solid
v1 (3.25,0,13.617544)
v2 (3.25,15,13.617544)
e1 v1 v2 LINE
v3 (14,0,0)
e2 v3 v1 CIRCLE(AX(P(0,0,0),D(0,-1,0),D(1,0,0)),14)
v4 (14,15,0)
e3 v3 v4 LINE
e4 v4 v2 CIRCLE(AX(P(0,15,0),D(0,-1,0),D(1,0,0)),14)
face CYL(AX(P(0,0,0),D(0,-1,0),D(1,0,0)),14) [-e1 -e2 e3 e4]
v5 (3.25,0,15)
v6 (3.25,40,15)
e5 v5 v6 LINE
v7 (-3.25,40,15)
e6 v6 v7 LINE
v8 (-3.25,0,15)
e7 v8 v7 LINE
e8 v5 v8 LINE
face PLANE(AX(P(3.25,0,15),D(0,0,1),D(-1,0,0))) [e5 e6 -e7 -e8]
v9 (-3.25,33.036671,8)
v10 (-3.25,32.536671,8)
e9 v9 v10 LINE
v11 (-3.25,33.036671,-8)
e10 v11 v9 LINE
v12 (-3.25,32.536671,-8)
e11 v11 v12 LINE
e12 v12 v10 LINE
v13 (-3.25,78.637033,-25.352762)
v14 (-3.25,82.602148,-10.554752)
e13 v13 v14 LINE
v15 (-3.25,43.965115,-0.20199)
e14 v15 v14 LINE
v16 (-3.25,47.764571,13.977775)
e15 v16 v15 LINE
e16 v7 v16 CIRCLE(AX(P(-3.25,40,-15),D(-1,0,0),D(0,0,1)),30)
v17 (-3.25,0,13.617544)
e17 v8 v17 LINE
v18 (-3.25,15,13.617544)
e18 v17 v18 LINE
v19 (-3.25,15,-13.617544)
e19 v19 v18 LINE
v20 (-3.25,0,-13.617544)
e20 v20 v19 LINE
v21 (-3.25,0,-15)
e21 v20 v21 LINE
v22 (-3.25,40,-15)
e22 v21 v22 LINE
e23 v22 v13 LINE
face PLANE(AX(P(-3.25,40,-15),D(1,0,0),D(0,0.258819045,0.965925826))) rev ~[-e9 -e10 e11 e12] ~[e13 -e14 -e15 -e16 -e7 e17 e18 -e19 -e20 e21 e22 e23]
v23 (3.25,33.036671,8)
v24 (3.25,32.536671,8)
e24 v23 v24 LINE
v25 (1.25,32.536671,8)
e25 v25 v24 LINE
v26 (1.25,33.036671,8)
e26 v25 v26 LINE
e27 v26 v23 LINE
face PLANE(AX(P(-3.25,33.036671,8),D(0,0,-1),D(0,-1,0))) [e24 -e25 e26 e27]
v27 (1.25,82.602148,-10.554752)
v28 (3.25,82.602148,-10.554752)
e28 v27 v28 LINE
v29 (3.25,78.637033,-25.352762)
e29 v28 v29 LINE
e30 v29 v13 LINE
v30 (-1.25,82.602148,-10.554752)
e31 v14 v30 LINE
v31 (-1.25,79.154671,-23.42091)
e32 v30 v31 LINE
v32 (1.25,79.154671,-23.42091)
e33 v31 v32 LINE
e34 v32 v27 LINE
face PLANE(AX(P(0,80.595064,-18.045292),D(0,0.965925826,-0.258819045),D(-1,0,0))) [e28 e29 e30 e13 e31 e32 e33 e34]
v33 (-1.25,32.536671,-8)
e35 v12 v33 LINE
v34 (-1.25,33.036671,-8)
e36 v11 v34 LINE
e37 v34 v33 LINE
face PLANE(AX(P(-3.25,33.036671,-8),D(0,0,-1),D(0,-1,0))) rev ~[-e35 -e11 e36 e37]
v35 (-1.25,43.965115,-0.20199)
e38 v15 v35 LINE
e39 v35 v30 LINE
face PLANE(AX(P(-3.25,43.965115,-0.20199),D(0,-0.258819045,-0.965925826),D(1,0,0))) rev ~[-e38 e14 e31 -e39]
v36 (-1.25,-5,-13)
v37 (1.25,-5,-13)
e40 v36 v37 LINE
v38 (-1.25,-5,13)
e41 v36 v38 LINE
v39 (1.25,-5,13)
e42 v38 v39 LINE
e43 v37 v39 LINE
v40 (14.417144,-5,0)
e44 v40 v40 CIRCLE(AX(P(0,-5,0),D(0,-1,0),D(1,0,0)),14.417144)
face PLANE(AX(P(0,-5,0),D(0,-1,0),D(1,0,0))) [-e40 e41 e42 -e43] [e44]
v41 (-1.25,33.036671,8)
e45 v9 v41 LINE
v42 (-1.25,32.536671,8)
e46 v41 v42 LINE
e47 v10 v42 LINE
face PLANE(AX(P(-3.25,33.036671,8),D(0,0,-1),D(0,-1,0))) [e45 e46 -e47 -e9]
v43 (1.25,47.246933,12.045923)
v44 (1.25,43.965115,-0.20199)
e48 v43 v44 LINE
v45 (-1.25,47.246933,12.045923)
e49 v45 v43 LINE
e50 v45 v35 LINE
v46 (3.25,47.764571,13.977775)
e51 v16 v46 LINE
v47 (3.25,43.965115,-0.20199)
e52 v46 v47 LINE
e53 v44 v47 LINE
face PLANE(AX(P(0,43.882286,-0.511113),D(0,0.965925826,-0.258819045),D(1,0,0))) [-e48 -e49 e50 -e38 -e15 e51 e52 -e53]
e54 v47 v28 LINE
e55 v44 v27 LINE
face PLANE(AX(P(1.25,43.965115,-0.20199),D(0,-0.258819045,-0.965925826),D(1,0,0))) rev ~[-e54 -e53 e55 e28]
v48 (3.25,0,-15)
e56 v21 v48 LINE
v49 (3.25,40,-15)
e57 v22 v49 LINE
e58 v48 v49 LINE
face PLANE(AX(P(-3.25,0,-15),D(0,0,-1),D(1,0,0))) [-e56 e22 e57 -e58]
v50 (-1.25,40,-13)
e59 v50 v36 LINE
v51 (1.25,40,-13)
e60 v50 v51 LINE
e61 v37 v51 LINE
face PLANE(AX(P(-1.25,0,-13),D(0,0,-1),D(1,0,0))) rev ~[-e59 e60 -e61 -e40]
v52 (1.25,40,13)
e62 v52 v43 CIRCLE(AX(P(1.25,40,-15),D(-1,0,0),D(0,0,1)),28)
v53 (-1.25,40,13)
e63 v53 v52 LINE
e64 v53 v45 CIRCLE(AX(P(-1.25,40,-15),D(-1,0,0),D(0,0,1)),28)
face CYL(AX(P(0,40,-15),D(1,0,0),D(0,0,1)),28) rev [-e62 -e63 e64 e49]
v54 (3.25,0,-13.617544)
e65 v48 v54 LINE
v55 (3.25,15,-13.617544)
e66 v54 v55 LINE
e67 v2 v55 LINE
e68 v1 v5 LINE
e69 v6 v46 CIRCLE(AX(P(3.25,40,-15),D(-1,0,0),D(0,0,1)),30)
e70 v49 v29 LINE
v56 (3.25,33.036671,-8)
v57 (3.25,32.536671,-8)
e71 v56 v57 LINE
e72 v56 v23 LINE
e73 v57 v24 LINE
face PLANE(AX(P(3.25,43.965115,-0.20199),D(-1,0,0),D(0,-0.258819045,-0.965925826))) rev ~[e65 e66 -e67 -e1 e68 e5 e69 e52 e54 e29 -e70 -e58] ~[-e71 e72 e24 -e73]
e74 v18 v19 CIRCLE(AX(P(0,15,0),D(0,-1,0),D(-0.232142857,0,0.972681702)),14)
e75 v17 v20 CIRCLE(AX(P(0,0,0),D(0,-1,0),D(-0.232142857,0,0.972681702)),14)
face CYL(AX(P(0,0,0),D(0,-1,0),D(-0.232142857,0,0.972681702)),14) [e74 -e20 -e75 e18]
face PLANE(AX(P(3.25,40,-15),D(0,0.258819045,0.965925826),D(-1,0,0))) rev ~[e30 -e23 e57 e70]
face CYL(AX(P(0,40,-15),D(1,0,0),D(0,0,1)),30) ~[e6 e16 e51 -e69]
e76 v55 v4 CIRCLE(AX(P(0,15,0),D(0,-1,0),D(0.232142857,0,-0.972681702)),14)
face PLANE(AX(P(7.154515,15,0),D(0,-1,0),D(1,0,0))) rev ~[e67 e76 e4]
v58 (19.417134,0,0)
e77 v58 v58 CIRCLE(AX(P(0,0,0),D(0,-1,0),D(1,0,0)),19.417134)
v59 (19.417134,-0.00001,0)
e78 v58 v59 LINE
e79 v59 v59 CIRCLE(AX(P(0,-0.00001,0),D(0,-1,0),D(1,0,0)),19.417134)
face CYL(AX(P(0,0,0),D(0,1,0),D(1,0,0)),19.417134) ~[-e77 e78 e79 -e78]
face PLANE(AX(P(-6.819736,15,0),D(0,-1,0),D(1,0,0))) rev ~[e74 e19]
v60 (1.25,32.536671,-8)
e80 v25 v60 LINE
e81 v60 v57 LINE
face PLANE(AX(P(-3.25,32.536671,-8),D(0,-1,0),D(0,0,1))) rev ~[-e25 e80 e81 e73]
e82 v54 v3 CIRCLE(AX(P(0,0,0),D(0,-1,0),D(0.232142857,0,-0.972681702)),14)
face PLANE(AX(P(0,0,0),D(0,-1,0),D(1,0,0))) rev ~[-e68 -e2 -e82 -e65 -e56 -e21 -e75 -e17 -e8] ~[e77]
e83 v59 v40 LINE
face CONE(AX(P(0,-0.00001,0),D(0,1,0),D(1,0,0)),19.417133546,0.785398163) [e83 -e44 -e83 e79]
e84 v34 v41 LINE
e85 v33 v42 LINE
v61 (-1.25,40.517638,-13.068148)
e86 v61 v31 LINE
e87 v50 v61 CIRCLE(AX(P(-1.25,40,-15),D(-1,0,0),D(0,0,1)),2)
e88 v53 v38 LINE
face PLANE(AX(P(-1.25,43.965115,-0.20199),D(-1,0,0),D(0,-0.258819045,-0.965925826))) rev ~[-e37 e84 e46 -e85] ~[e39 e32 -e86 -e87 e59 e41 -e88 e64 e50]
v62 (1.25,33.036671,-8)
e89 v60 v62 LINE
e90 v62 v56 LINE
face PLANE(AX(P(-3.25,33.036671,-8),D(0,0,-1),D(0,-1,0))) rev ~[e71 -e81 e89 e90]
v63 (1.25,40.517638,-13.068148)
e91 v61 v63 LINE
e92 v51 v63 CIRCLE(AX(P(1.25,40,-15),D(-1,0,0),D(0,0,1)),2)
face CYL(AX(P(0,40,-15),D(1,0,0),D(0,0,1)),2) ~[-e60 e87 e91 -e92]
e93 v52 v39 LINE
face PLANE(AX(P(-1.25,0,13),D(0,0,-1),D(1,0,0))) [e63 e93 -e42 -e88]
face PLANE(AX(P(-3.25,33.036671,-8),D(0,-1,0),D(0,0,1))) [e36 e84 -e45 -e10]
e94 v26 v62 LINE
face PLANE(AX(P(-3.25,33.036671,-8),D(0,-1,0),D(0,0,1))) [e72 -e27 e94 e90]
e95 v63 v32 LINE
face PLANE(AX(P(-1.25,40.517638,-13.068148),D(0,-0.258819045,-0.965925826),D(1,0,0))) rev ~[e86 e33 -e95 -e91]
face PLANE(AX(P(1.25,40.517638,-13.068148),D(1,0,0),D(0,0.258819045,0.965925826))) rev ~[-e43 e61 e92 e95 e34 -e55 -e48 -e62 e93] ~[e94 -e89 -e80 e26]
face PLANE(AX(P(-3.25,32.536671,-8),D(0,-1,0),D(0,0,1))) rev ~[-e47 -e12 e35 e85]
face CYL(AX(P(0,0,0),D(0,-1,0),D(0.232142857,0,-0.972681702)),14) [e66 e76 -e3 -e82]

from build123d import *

# Parameters (mm, degrees)
F0_R        = 19.417133546
F0_W        = 2.5
F0_H        = 26
F1_DEPTH    = 5
F2_SIZE     = 4.99999
F3_DEPTH    = 40
F3_FACE_W   = 6.5
F3_FACE_H   = 30
F3_FACE_W_2 = 2.5
F3_FACE_H_2 = 26
F4_ANGLE    = 15
F6_DEPTH    = 40
F7_W        = 0.5
F7_H        = 16
F8_DEPTH    = 25
F9_DEPTH    = 15


# Not quite as in the source:
# - a fillet or chamfer is up to 0.001 mm smaller than in the source, because OpenCascade refuses the exact size


with BuildPart() as f1:
    # F0 (on Front) → F1 (new body)
    with BuildSketch(Plane.XZ):
        Circle(F0_R)
        with BuildLine():
            ThreePointArc((3.25, 13.6175438314), (10.9886304879, 8.6746757864), (14, 0))
            ThreePointArc((14, 0), (10.9886304879, -8.6746757864), (3.25, -13.6175438314))
            Line((3.25, -13.6175438314), (3.25, -15))
            Line((3.25, -15), (-3.25, -15))
            Line((-3.25, -15), (-3.25, -13.6175438314))
            ThreePointArc((-3.25, -13.6175438314), (-14, 0), (-3.25, 13.6175438314))
            Line((-3.25, 13.6175438314), (-3.25, 15))
            Line((-3.25, 15), (3.25, 15))
            Line((3.25, 15), (3.25, 13.6175438314))
        make_face(mode=Mode.SUBTRACT)
        with BuildLine():
            Line((-3.25, -13.6175438314), (-3.25, 13.6175438314))
            ThreePointArc((-3.25, 13.6175438314), (-14, 0), (-3.25, -13.6175438314))
        make_face()
        with BuildLine():
            ThreePointArc((3.25, -13.6175438314), (10.9886304879, -8.6746757864), (14, 0))
            ThreePointArc((14, 0), (10.9886304879, 8.6746757864), (3.25, 13.6175438314))
            Line((3.25, 13.6175438314), (3.25, -13.6175438314))
        make_face()
        with BuildLine():
            Line((3.25, -13.6175438314), (3.25, 13.6175438314))
            ThreePointArc((3.25, 13.6175438314), (0, 14), (-3.25, 13.6175438314))
            Line((-3.25, 13.6175438314), (-3.25, -13.6175438314))
            ThreePointArc((-3.25, -13.6175438314), (0, -14), (3.25, -13.6175438314))
        make_face()
        Rectangle(F0_W, F0_H, mode=Mode.SUBTRACT)
        with BuildLine():
            Line((3.25, -15), (3.25, -13.6175438314))
            ThreePointArc((3.25, -13.6175438314), (0, -14), (-3.25, -13.6175438314))
            Line((-3.25, -13.6175438314), (-3.25, -15))
            Line((-3.25, -15), (3.25, -15))
        make_face()
        with BuildLine():
            ThreePointArc((-3.25, 13.6175438314), (0, 14), (3.25, 13.6175438314))
            Line((3.25, 13.6175438314), (3.25, 15))
            Line((3.25, 15), (-3.25, 15))
            Line((-3.25, 15), (-3.25, 13.6175438314))
        make_face()
    extrude(amount=F1_DEPTH)

    # F2 (size 5 in the source; OpenCascade refuses exactly that, so slightly less here)
    f2_edges = [f1.edges().sort_by_distance(p)[0] for p in [
        (-19.417134, -5, 0),
    ]]
    chamfer(f2_edges, length=F2_SIZE)

    # F0 (on Front) → F3 (join)
    with BuildSketch(Plane.XZ):
        with BuildLine():
            ThreePointArc((-3.25, 13.6175438314), (0, 14), (3.25, 13.6175438314))
            Line((3.25, 13.6175438314), (3.25, 15))
            Line((3.25, 15), (-3.25, 15))
            Line((-3.25, 15), (-3.25, 13.6175438314))
        make_face()
        with BuildLine():
            Line((3.25, -13.6175438314), (3.25, 13.6175438314))
            ThreePointArc((3.25, 13.6175438314), (0, 14), (-3.25, 13.6175438314))
            Line((-3.25, 13.6175438314), (-3.25, -13.6175438314))
            ThreePointArc((-3.25, -13.6175438314), (0, -14), (3.25, -13.6175438314))
        make_face()
        Rectangle(F0_W, F0_H, mode=Mode.SUBTRACT)
        with BuildLine():
            Line((3.25, -15), (3.25, -13.6175438314))
            ThreePointArc((3.25, -13.6175438314), (0, -14), (-3.25, -13.6175438314))
            Line((-3.25, -13.6175438314), (-3.25, -15))
            Line((-3.25, -15), (3.25, -15))
        make_face()
    extrude(amount=-F3_DEPTH)

    # F3_face (on face) → F4 (revolve)
    with BuildSketch(Plane(origin=(0, 40, 0), x_dir=(1, 0, 0), z_dir=(0, 1, 0))):
        Rectangle(F3_FACE_W, F3_FACE_H)
        Rectangle(F3_FACE_W_2, F3_FACE_H_2, mode=Mode.SUBTRACT)
    revolve(axis=Axis((0, 40, -15), (-1, 0, 0)), revolution_arc=F4_ANGLE)

    # F5 (on face) → F6 (join)
    with BuildSketch(Plane(origin=(0, 41.0705080757, -11.0048094716), x_dir=(-1, 0, 0), z_dir=(0, 0.9659258263, -0.2588190451))):
        Polygon((3.25, -4.1361255902), (3.25, 11.1839016899), (1.25, 11.1839016899), (1.25, -2.1361255902), (-1.25, -2.1361255902), (-1.25, 11.1839016899), (-3.25, 11.1839016899), (-3.25, -4.1361255902), align=None)
    extrude(amount=F6_DEPTH)

    # F7 (on face) → F8 (cut)
    with BuildSketch(Plane(origin=(-3.25, 0, 0), x_dir=(0, -1, 0), z_dir=(-1, 0, 0))):
        with Locations((-32.7866710722, 0)):
            Rectangle(F7_W, F7_H)
    extrude(amount=-F8_DEPTH, mode=Mode.SUBTRACT)

    # F0 (on Front) → F9 (join)
    with BuildSketch(Plane.XZ):
        with BuildLine():
            ThreePointArc((3.25, -13.6175438314), (10.9886304879, -8.6746757864), (14, 0))
            ThreePointArc((14, 0), (10.9886304879, 8.6746757864), (3.25, 13.6175438314))
            Line((3.25, 13.6175438314), (3.25, -13.6175438314))
        make_face()
        with BuildLine():
            Line((-3.25, -13.6175438314), (-3.25, 13.6175438314))
            ThreePointArc((-3.25, 13.6175438314), (-14, 0), (-3.25, -13.6175438314))
        make_face()
    extrude(amount=-F9_DEPTH)


solid = f1.part
